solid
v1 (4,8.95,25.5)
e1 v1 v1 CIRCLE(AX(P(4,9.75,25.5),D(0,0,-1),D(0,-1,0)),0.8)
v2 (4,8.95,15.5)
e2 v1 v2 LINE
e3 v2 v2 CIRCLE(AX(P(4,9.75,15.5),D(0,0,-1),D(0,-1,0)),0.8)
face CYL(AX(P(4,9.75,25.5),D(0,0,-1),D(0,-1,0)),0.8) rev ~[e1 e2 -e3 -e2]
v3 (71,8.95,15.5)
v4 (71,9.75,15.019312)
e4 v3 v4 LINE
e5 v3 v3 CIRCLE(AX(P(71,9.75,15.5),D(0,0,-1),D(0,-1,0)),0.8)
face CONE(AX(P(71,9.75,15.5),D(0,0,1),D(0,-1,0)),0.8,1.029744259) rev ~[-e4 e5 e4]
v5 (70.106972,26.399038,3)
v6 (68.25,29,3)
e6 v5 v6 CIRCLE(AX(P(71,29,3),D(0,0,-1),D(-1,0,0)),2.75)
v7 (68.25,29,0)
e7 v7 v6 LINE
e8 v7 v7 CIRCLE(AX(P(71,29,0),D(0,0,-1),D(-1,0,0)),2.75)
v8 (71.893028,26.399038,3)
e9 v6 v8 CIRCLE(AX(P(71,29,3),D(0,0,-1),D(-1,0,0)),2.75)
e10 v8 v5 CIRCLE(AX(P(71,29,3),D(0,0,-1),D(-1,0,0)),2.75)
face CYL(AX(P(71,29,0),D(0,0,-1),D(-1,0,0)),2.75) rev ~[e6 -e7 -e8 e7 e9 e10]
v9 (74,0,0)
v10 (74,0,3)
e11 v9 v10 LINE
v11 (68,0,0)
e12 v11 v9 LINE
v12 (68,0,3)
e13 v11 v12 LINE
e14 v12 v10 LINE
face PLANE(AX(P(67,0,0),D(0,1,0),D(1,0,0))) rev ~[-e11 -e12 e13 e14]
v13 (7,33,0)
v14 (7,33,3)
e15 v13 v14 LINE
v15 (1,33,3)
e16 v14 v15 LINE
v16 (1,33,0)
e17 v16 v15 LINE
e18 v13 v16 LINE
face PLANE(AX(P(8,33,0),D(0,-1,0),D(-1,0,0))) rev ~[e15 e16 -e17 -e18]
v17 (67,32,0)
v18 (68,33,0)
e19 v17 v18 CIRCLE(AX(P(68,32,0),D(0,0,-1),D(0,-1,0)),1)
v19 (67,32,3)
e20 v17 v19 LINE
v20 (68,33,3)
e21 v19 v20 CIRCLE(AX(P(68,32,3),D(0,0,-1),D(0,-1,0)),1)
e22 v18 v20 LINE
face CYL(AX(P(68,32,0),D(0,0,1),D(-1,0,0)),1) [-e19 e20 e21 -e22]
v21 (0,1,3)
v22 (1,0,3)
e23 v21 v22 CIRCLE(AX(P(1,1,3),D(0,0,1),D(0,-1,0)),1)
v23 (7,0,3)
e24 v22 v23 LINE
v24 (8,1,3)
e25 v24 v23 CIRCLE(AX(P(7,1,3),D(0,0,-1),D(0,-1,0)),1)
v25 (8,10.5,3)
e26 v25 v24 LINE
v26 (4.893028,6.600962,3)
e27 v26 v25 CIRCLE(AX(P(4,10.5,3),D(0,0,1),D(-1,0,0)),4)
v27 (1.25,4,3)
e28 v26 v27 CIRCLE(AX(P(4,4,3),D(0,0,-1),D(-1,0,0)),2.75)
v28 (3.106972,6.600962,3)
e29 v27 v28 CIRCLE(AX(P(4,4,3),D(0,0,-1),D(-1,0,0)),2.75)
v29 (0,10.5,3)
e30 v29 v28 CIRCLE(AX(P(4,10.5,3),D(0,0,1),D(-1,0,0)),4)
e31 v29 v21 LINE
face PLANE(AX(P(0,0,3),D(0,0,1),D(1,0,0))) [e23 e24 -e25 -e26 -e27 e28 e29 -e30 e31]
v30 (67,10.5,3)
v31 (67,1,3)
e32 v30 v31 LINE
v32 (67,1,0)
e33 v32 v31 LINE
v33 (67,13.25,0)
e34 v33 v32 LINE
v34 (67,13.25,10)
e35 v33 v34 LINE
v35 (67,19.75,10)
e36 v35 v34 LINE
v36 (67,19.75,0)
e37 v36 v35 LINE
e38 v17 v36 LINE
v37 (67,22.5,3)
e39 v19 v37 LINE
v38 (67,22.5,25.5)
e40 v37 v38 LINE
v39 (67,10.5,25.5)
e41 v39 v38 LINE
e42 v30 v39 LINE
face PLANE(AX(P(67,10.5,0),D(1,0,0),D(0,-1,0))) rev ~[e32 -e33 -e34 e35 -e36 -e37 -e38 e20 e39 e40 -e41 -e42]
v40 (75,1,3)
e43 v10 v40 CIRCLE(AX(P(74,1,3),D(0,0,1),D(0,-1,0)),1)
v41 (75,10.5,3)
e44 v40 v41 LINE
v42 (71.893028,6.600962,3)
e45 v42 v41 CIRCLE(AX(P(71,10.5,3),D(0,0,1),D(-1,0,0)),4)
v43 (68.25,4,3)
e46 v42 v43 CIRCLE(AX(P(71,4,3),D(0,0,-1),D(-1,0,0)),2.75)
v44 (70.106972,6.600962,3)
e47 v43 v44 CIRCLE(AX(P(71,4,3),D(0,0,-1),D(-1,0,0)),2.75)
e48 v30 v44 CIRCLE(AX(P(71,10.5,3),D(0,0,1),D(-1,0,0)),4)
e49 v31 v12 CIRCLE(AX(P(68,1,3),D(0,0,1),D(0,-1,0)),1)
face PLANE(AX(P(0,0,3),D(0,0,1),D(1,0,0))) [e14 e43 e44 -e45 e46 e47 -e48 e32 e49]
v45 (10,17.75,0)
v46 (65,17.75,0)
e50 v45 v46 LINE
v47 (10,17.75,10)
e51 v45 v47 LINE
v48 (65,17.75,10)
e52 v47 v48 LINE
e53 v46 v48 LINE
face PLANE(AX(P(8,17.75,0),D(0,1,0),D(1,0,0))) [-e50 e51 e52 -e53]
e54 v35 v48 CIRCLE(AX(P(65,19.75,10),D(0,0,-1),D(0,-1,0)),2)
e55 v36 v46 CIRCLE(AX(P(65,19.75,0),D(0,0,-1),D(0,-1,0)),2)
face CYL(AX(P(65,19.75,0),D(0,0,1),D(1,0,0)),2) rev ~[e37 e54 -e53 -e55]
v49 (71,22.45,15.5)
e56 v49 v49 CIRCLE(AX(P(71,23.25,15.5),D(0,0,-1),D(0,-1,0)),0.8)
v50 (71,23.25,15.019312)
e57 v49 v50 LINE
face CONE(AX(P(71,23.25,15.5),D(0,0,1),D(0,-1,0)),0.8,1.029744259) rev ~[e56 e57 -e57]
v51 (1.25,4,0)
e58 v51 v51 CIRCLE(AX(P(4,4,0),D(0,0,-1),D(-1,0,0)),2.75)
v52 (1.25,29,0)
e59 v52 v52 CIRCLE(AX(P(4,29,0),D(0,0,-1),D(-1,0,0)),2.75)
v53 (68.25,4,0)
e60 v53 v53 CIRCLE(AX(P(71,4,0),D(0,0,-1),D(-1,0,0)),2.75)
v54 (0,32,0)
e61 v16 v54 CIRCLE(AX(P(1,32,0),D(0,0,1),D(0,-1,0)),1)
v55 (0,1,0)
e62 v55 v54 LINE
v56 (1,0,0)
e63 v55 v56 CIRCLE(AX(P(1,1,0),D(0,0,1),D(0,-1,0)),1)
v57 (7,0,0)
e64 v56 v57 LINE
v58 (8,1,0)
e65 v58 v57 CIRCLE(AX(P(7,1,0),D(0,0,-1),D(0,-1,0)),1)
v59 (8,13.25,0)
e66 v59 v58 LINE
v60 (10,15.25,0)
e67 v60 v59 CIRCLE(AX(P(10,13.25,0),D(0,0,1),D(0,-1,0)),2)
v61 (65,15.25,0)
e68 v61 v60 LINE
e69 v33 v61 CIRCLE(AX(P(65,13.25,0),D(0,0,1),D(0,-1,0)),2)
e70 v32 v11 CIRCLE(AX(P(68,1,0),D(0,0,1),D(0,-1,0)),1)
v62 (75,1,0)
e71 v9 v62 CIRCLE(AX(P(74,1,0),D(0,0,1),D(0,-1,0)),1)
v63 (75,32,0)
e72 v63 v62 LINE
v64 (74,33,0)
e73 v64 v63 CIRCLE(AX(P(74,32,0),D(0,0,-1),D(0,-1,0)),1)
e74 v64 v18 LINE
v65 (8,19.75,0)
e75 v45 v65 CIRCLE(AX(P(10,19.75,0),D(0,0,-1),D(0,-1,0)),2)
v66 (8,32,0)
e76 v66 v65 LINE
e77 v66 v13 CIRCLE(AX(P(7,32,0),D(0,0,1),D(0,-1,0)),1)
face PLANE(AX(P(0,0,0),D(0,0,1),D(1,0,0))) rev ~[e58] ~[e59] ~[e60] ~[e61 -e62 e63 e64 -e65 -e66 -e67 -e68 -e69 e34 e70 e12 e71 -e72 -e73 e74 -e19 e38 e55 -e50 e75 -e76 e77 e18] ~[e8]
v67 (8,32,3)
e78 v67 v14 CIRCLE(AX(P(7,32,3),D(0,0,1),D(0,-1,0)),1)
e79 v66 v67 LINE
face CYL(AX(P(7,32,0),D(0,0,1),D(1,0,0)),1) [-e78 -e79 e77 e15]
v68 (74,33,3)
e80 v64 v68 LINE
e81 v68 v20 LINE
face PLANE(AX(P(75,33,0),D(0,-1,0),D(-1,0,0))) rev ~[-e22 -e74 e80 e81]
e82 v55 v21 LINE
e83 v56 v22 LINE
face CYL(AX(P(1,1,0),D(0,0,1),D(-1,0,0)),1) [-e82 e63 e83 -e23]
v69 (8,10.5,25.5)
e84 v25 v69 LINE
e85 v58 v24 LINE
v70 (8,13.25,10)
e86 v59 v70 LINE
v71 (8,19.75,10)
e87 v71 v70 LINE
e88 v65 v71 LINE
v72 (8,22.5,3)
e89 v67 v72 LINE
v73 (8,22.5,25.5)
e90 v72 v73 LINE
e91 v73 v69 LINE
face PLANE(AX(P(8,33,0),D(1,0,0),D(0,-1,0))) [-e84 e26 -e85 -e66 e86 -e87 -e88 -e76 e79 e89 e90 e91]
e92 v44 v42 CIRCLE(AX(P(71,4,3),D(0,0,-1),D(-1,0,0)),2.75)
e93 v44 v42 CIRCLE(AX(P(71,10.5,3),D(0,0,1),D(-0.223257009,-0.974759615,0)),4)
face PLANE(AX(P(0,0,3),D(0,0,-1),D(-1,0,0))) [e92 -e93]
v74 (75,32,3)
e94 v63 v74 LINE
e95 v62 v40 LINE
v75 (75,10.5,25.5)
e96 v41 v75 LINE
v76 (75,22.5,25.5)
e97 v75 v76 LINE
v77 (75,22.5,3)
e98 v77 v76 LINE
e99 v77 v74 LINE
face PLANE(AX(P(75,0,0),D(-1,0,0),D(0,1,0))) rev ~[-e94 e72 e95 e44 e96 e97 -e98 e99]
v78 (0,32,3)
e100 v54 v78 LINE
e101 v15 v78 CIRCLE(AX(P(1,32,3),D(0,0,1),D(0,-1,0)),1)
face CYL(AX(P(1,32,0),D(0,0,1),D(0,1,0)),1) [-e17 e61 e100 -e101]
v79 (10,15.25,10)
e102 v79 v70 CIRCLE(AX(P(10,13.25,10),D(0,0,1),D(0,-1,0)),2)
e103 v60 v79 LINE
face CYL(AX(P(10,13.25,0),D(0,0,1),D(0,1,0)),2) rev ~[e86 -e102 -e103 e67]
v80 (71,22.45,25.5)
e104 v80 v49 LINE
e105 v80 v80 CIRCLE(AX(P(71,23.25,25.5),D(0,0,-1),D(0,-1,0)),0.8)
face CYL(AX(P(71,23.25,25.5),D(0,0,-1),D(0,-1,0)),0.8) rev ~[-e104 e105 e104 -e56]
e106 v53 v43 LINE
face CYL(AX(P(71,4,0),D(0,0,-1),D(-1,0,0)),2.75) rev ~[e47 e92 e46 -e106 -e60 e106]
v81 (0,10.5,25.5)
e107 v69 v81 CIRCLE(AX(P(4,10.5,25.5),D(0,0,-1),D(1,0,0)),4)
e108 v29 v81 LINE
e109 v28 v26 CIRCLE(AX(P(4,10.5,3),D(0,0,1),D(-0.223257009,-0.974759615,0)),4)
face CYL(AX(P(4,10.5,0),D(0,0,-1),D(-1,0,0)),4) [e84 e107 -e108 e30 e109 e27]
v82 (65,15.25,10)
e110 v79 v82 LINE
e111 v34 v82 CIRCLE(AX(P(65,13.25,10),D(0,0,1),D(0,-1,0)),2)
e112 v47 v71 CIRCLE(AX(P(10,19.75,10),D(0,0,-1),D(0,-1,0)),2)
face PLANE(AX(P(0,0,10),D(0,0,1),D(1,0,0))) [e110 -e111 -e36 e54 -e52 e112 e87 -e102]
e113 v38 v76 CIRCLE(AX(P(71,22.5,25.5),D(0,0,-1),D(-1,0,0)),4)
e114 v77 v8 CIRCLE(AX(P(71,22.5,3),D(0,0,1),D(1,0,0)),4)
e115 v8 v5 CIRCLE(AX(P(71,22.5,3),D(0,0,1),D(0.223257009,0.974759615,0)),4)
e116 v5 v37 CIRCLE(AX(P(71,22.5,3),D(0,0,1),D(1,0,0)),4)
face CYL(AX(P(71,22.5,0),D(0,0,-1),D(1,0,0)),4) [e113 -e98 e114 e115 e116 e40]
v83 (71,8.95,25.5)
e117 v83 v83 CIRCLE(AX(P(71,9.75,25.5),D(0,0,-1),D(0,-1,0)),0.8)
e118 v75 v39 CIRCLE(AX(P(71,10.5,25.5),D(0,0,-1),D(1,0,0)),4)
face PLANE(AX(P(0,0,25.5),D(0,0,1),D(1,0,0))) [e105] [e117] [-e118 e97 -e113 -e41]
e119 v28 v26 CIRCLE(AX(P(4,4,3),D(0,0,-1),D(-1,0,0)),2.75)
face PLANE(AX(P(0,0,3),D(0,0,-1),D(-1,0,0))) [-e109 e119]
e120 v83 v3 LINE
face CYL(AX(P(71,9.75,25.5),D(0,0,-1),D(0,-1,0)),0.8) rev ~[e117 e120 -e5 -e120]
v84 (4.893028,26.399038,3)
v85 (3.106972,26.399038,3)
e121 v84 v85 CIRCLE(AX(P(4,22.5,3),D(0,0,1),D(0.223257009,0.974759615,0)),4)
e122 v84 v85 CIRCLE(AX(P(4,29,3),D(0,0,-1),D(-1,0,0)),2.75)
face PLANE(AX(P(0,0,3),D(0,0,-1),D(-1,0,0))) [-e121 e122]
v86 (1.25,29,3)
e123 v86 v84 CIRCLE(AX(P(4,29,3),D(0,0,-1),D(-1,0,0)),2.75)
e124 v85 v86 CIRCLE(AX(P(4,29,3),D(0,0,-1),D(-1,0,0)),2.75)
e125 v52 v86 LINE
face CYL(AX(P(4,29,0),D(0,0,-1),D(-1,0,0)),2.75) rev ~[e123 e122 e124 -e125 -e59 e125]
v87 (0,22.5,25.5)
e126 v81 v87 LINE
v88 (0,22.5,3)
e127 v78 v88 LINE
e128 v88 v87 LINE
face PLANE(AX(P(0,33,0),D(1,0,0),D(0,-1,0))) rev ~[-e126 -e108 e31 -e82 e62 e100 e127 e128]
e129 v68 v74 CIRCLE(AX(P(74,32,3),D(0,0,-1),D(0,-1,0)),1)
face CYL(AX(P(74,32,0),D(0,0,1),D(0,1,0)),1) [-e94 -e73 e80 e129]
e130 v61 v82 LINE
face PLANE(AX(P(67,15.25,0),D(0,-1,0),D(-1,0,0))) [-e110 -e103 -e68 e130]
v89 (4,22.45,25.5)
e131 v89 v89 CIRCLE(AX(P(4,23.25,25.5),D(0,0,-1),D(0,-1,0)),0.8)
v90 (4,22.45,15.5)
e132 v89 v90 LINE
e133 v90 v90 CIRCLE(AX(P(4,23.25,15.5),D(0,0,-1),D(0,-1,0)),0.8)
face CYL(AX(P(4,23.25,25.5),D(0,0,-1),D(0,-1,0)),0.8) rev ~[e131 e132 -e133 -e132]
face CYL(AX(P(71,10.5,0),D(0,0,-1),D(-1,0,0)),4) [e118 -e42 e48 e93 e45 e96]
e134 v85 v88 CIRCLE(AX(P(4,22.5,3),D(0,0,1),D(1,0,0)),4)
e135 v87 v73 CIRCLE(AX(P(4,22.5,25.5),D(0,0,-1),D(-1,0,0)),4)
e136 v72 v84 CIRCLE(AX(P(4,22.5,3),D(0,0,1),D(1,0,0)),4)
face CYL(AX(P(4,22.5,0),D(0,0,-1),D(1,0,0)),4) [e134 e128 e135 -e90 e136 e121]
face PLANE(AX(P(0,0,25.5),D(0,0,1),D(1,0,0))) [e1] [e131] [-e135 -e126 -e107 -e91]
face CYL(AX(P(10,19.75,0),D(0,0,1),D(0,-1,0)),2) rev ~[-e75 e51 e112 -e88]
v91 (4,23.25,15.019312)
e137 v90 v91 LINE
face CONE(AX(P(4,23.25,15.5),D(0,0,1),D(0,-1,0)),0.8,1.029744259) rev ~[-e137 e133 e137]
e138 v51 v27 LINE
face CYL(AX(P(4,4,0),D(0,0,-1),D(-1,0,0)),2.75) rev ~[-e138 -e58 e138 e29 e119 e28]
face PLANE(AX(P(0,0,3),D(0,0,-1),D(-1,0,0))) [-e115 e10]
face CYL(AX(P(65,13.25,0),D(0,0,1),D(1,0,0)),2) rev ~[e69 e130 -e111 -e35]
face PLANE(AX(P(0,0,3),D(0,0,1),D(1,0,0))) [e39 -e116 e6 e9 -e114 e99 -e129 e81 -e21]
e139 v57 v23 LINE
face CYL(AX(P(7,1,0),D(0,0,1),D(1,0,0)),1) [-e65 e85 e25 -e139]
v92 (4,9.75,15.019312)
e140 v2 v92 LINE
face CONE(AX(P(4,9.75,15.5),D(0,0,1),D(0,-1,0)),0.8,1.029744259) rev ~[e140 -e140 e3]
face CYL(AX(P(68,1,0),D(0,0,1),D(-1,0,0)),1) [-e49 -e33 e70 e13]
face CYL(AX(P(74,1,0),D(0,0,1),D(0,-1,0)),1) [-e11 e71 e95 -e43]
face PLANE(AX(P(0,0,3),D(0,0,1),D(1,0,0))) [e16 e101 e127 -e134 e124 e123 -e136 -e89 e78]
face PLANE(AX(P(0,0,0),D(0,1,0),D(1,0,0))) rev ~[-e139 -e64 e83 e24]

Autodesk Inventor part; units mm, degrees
ref_plane "YZ Plane" through (0, 0, 0) normal (1, 0, 0) x (0, 1, 0)
ref_plane "XZ Plane" through (0, 0, 0) normal (0, 1, 0) x (-1, 0, 0)
ref_plane "XY Plane" through (0, 0, 0) normal (0, 0, 1) x (1, 0, 0)
sketch "Esquisse1" plane through (0, 0, 0) normal (0, 0, 1) x (1, 0, 0)
  line L0 (75, 0) -> (75, 33)
  line L1 (0, 33) -> (0, 0)
  line L2 (8, 33) -> (8, 0)
  line L3 (67, 33) -> (67, 0)
  line L4 (8, 17.75) -> (67, 17.75)
  line L5 (67, 17.75) -> (67, 15.25)
  line L6 (67, 15.25) -> (8, 15.25)
  line L7 (8, 15.25) -> (8, 17.75)
  line L8 (75, 33) -> (67, 33)
  line L9 (8, 33) -> (0, 33)
  line L10 (0, 0) -> (8, 0)
  line L11 (67, 0) -> (75, 0)
  line L12 (1.5, 6.5) -> (6.5, 6.5)
  line L13 (6.5, 6.5) -> (6.5, 1.5)
  line L14 (6.5, 1.5) -> (1.5, 1.5)
  line L15 (1.5, 1.5) -> (1.5, 6.5)
  line L16 (0, 16.5) -> (-2.6312, 16.5)
  line L17 (37.5, 15.25) -> (37.5, 13.3261)
  line L18 (1.5, 26.5) -> (6.5, 26.5)
  line L19 (6.5, 26.5) -> (6.5, 31.5)
  line L20 (6.5, 31.5) -> (1.5, 31.5)
  line L21 (1.5, 31.5) -> (1.5, 26.5)
  line L22 (73.5, 6.5) -> (68.5, 6.5)
  line L23 (68.5, 6.5) -> (68.5, 1.5)
  line L24 (68.5, 1.5) -> (73.5, 1.5)
  line L25 (73.5, 1.5) -> (73.5, 6.5)
  line L26 (68.5, 26.5) -> (68.5, 31.5)
  line L27 (68.5, 31.5) -> (73.5, 31.5)
  line L28 (73.5, 31.5) -> (73.5, 26.5)
  line L29 (73.5, 26.5) -> (68.5, 26.5)
  arc A0 (8, 22.5) -> (0, 22.5) centre (4, 22.5) ccw
  arc A1 (0, 10.5) -> (8, 10.5) centre (4, 10.5) ccw
  arc A2 (75, 22.5) -> (67, 22.5) centre (71, 22.5) ccw
  arc A3 (67, 10.5) -> (75, 10.5) centre (71, 10.5) ccw
  line L30 (67, 22.5) -> (67, 10.5)
  line L31 (75, 10.5) -> (75, 22.5)
  line L32 (8, 22.5) -> (8, 10.5)
  line L33 (0, 10.5) -> (0, 22.5)
  dimension "d0" = 33
  dimension "d1" = 75
  dimension "d2" = 8
  dimension "d3" = 8
  dimension "d4" = 2.5
  dimension "d6" = 5
  dimension "d7" = 5
  dimension "d8" = 1.5
  dimension "d9" = 1.5
  dimension "d10" = 8
  dimension "d11" = 8
  dimension "d12" = 12
  dimension "d13" = 10.5
extrude "Extrusion1" add sketch "Esquisse1" along normal blind 3 contours L11 L3 A3 L0 | A2 L3 L8 L0 | A0 L1 L9 L2 | L2 L10 L1 A1
extrude "Extrusion2" add sketch "Esquisse1" along normal blind 25.5 contours A3 L3 A2 L0 | L2 A1 L1 A0
extrude "Extrusion3" add sketch "Esquisse1" along normal blind 10 contours L6 L2 L4 L3
fillet "Congé1" radius 2 4 edges at (8, 15.25, 5) (8, 17.75, 5) (67, 15.25, 5) (67, 17.75, 5)
hole "Perçage1" at (71, 23.25, 25.5) direction (0, 0, -1) diameter 1.6 depth 10 tip angle 118
hole "Perçage2" at (71, 9.75, 25.5) direction (0, 0, -1) diameter 1.6 depth 10 tip angle 118
hole "Perçage3" at (4, 23.25, 25.5) direction (0, 0, -1) diameter 1.6 depth 10 tip angle 118
hole "Perçage4" at (4, 9.75, 25.5) direction (0, 0, -1) diameter 1.6 depth 10 tip angle 118
fillet "Congé2" radius 1 8 edges at (8, 0, 1.5) (0, 0, 1.5) (67, 0, 1.5) (75, 0, 1.5) (67, 33, 1.5) (75, 33, 1.5) (8, 33, 1.5) (0, 33, 1.5)
sketch "Esquisse3" plane through (0, 0, 3) normal (0, 0, 1) x (1, 0, 0)
  arc A0 (1, 33) -> (0, 32) centre (1, 32) ccw projected
  line L0 (0, 32) -> (0, 22.5) projected
  arc A1 (4, 26.5) -> (0, 22.5) centre (4, 22.5) ccw projected
  line L1 (4, 26.5) -> (1.5, 26.5) projected
  line L2 (1.5, 26.5) -> (1.5, 31.5) projected
  line L3 (1.5, 31.5) -> (6.5, 31.5) projected
  line L4 (6.5, 31.5) -> (6.5, 26.5) projected
  line L5 (6.5, 26.5) -> (4, 26.5) projected
  arc A2 (8, 22.5) -> (4, 26.5) centre (4, 22.5) ccw projected
  line L6 (8, 22.5) -> (8, 32) projected
  arc A3 (8, 32) -> (7, 33) centre (7, 32) ccw projected
  line L7 (7, 33) -> (1, 33) projected
  arc A4 (75, 32) -> (74, 33) centre (74, 32) ccw projected
  line L8 (74, 33) -> (68, 33) projected
  arc A5 (68, 33) -> (67, 32) centre (68, 32) ccw projected
  line L9 (67, 32) -> (67, 22.5) projected
  arc A6 (71, 26.5) -> (67, 22.5) centre (71, 22.5) ccw projected
  line L10 (71, 26.5) -> (68.5, 26.5) projected
  line L11 (68.5, 26.5) -> (68.5, 31.5) projected
  line L12 (68.5, 31.5) -> (73.5, 31.5) projected
  line L13 (73.5, 31.5) -> (73.5, 26.5) projected
  line L14 (73.5, 26.5) -> (71, 26.5) projected
  arc A7 (75, 22.5) -> (71, 26.5) centre (71, 22.5) ccw projected
  line L15 (75, 22.5) -> (75, 32) projected
  arc A8 (74, 0) -> (75, 1) centre (74, 1) ccw projected
  line L16 (75, 1) -> (75, 10.5) projected
  arc A9 (71, 6.5) -> (75, 10.5) centre (71, 10.5) ccw projected
  line L17 (71, 6.5) -> (73.5, 6.5) projected
  line L18 (73.5, 6.5) -> (73.5, 1.5) projected
  line L19 (73.5, 1.5) -> (68.5, 1.5) projected
  line L20 (68.5, 1.5) -> (68.5, 6.5) projected
  line L21 (68.5, 6.5) -> (71, 6.5) projected
  arc A10 (67, 10.5) -> (71, 6.5) centre (71, 10.5) ccw projected
  line L22 (67, 10.5) -> (67, 1) projected
  arc A11 (67, 1) -> (68, 0) centre (68, 1) ccw projected
  line L23 (68, 0) -> (74, 0) projected
  arc A12 (0, 1) -> (1, 0) centre (1, 1) ccw projected
  line L24 (1, 0) -> (7, 0) projected
  arc A13 (7, 0) -> (8, 1) centre (7, 1) ccw projected
  line L25 (8, 1) -> (8, 10.5) projected
  arc A14 (4, 6.5) -> (8, 10.5) centre (4, 10.5) ccw projected
  line L26 (4, 6.5) -> (6.5, 6.5) projected
  line L27 (6.5, 6.5) -> (6.5, 1.5) projected
  line L28 (6.5, 1.5) -> (1.5, 1.5) projected
  line L29 (1.5, 1.5) -> (1.5, 6.5) projected
  line L30 (1.5, 6.5) -> (4, 6.5) projected
  arc A15 (0, 10.5) -> (4, 6.5) centre (4, 10.5) ccw projected
  line L31 (0, 10.5) -> (0, 1) projected
  circle A16 centre (4, 29) radius 2.5
  circle A17 centre (4, 4) radius 2.5
  circle A18 centre (71, 4) radius 2.5
  circle A19 centre (71, 29) radius 2.5
  point P0 (0, 0)
extrude "Extrusion4" add sketch "Esquisse3" against normal up to surface (3 mm away) contours L1 L2 A16 | A16 L4 L5 | A16 L3 L4 | L2 L3 A16 | L10 L11 A19 | A19 L13 L14 | L15 A7 A6 L9 A5 L8 A4 | A19 L12 L13 | L11 L12 A19 | L17 L18 A18 | A18 L20 L21 | L18 L19 A18 | A18 L19 L20 | L26 L27 A17 | A17 L29 L30 | L31 A15 A14 L25 A13 L24 A12 | L27 L28 A17 | A17 L28 L29
sketch "Esquisse4" plane through (0, 0, 0) normal (0, 0, -1) x (-1, 0, 0)
  circle A0 centre (-4, 29) radius 2.5 projected
  circle A1 centre (-4, 4) radius 2.5 projected
  circle A2 centre (-71, 4) radius 2.5 projected
  circle A3 centre (-71, 29) radius 2.5 projected
  circle A4 centre (-4, 29) radius 2.75
  circle A5 centre (-4, 4) radius 2.75
  circle A6 centre (-71, 29) radius 2.75
  circle A7 centre (-71, 4) radius 2.75
  point P0 (0, 0)
  dimension "d61" = 5.5
  dimension "d62" = 5.5
  dimension "d63" = 5.5
  dimension "d64" = 5.5
extrude "Extrusion5" cut sketch "Esquisse4" against normal blind 3
equation "\"d9\" = -0.5 * d6 + 0.5 * d2"
equation "\"d13\" = -0.5 * d12 + 0.5 * d0"
properties part number "red_part-july21" material "Plastique ABS"
